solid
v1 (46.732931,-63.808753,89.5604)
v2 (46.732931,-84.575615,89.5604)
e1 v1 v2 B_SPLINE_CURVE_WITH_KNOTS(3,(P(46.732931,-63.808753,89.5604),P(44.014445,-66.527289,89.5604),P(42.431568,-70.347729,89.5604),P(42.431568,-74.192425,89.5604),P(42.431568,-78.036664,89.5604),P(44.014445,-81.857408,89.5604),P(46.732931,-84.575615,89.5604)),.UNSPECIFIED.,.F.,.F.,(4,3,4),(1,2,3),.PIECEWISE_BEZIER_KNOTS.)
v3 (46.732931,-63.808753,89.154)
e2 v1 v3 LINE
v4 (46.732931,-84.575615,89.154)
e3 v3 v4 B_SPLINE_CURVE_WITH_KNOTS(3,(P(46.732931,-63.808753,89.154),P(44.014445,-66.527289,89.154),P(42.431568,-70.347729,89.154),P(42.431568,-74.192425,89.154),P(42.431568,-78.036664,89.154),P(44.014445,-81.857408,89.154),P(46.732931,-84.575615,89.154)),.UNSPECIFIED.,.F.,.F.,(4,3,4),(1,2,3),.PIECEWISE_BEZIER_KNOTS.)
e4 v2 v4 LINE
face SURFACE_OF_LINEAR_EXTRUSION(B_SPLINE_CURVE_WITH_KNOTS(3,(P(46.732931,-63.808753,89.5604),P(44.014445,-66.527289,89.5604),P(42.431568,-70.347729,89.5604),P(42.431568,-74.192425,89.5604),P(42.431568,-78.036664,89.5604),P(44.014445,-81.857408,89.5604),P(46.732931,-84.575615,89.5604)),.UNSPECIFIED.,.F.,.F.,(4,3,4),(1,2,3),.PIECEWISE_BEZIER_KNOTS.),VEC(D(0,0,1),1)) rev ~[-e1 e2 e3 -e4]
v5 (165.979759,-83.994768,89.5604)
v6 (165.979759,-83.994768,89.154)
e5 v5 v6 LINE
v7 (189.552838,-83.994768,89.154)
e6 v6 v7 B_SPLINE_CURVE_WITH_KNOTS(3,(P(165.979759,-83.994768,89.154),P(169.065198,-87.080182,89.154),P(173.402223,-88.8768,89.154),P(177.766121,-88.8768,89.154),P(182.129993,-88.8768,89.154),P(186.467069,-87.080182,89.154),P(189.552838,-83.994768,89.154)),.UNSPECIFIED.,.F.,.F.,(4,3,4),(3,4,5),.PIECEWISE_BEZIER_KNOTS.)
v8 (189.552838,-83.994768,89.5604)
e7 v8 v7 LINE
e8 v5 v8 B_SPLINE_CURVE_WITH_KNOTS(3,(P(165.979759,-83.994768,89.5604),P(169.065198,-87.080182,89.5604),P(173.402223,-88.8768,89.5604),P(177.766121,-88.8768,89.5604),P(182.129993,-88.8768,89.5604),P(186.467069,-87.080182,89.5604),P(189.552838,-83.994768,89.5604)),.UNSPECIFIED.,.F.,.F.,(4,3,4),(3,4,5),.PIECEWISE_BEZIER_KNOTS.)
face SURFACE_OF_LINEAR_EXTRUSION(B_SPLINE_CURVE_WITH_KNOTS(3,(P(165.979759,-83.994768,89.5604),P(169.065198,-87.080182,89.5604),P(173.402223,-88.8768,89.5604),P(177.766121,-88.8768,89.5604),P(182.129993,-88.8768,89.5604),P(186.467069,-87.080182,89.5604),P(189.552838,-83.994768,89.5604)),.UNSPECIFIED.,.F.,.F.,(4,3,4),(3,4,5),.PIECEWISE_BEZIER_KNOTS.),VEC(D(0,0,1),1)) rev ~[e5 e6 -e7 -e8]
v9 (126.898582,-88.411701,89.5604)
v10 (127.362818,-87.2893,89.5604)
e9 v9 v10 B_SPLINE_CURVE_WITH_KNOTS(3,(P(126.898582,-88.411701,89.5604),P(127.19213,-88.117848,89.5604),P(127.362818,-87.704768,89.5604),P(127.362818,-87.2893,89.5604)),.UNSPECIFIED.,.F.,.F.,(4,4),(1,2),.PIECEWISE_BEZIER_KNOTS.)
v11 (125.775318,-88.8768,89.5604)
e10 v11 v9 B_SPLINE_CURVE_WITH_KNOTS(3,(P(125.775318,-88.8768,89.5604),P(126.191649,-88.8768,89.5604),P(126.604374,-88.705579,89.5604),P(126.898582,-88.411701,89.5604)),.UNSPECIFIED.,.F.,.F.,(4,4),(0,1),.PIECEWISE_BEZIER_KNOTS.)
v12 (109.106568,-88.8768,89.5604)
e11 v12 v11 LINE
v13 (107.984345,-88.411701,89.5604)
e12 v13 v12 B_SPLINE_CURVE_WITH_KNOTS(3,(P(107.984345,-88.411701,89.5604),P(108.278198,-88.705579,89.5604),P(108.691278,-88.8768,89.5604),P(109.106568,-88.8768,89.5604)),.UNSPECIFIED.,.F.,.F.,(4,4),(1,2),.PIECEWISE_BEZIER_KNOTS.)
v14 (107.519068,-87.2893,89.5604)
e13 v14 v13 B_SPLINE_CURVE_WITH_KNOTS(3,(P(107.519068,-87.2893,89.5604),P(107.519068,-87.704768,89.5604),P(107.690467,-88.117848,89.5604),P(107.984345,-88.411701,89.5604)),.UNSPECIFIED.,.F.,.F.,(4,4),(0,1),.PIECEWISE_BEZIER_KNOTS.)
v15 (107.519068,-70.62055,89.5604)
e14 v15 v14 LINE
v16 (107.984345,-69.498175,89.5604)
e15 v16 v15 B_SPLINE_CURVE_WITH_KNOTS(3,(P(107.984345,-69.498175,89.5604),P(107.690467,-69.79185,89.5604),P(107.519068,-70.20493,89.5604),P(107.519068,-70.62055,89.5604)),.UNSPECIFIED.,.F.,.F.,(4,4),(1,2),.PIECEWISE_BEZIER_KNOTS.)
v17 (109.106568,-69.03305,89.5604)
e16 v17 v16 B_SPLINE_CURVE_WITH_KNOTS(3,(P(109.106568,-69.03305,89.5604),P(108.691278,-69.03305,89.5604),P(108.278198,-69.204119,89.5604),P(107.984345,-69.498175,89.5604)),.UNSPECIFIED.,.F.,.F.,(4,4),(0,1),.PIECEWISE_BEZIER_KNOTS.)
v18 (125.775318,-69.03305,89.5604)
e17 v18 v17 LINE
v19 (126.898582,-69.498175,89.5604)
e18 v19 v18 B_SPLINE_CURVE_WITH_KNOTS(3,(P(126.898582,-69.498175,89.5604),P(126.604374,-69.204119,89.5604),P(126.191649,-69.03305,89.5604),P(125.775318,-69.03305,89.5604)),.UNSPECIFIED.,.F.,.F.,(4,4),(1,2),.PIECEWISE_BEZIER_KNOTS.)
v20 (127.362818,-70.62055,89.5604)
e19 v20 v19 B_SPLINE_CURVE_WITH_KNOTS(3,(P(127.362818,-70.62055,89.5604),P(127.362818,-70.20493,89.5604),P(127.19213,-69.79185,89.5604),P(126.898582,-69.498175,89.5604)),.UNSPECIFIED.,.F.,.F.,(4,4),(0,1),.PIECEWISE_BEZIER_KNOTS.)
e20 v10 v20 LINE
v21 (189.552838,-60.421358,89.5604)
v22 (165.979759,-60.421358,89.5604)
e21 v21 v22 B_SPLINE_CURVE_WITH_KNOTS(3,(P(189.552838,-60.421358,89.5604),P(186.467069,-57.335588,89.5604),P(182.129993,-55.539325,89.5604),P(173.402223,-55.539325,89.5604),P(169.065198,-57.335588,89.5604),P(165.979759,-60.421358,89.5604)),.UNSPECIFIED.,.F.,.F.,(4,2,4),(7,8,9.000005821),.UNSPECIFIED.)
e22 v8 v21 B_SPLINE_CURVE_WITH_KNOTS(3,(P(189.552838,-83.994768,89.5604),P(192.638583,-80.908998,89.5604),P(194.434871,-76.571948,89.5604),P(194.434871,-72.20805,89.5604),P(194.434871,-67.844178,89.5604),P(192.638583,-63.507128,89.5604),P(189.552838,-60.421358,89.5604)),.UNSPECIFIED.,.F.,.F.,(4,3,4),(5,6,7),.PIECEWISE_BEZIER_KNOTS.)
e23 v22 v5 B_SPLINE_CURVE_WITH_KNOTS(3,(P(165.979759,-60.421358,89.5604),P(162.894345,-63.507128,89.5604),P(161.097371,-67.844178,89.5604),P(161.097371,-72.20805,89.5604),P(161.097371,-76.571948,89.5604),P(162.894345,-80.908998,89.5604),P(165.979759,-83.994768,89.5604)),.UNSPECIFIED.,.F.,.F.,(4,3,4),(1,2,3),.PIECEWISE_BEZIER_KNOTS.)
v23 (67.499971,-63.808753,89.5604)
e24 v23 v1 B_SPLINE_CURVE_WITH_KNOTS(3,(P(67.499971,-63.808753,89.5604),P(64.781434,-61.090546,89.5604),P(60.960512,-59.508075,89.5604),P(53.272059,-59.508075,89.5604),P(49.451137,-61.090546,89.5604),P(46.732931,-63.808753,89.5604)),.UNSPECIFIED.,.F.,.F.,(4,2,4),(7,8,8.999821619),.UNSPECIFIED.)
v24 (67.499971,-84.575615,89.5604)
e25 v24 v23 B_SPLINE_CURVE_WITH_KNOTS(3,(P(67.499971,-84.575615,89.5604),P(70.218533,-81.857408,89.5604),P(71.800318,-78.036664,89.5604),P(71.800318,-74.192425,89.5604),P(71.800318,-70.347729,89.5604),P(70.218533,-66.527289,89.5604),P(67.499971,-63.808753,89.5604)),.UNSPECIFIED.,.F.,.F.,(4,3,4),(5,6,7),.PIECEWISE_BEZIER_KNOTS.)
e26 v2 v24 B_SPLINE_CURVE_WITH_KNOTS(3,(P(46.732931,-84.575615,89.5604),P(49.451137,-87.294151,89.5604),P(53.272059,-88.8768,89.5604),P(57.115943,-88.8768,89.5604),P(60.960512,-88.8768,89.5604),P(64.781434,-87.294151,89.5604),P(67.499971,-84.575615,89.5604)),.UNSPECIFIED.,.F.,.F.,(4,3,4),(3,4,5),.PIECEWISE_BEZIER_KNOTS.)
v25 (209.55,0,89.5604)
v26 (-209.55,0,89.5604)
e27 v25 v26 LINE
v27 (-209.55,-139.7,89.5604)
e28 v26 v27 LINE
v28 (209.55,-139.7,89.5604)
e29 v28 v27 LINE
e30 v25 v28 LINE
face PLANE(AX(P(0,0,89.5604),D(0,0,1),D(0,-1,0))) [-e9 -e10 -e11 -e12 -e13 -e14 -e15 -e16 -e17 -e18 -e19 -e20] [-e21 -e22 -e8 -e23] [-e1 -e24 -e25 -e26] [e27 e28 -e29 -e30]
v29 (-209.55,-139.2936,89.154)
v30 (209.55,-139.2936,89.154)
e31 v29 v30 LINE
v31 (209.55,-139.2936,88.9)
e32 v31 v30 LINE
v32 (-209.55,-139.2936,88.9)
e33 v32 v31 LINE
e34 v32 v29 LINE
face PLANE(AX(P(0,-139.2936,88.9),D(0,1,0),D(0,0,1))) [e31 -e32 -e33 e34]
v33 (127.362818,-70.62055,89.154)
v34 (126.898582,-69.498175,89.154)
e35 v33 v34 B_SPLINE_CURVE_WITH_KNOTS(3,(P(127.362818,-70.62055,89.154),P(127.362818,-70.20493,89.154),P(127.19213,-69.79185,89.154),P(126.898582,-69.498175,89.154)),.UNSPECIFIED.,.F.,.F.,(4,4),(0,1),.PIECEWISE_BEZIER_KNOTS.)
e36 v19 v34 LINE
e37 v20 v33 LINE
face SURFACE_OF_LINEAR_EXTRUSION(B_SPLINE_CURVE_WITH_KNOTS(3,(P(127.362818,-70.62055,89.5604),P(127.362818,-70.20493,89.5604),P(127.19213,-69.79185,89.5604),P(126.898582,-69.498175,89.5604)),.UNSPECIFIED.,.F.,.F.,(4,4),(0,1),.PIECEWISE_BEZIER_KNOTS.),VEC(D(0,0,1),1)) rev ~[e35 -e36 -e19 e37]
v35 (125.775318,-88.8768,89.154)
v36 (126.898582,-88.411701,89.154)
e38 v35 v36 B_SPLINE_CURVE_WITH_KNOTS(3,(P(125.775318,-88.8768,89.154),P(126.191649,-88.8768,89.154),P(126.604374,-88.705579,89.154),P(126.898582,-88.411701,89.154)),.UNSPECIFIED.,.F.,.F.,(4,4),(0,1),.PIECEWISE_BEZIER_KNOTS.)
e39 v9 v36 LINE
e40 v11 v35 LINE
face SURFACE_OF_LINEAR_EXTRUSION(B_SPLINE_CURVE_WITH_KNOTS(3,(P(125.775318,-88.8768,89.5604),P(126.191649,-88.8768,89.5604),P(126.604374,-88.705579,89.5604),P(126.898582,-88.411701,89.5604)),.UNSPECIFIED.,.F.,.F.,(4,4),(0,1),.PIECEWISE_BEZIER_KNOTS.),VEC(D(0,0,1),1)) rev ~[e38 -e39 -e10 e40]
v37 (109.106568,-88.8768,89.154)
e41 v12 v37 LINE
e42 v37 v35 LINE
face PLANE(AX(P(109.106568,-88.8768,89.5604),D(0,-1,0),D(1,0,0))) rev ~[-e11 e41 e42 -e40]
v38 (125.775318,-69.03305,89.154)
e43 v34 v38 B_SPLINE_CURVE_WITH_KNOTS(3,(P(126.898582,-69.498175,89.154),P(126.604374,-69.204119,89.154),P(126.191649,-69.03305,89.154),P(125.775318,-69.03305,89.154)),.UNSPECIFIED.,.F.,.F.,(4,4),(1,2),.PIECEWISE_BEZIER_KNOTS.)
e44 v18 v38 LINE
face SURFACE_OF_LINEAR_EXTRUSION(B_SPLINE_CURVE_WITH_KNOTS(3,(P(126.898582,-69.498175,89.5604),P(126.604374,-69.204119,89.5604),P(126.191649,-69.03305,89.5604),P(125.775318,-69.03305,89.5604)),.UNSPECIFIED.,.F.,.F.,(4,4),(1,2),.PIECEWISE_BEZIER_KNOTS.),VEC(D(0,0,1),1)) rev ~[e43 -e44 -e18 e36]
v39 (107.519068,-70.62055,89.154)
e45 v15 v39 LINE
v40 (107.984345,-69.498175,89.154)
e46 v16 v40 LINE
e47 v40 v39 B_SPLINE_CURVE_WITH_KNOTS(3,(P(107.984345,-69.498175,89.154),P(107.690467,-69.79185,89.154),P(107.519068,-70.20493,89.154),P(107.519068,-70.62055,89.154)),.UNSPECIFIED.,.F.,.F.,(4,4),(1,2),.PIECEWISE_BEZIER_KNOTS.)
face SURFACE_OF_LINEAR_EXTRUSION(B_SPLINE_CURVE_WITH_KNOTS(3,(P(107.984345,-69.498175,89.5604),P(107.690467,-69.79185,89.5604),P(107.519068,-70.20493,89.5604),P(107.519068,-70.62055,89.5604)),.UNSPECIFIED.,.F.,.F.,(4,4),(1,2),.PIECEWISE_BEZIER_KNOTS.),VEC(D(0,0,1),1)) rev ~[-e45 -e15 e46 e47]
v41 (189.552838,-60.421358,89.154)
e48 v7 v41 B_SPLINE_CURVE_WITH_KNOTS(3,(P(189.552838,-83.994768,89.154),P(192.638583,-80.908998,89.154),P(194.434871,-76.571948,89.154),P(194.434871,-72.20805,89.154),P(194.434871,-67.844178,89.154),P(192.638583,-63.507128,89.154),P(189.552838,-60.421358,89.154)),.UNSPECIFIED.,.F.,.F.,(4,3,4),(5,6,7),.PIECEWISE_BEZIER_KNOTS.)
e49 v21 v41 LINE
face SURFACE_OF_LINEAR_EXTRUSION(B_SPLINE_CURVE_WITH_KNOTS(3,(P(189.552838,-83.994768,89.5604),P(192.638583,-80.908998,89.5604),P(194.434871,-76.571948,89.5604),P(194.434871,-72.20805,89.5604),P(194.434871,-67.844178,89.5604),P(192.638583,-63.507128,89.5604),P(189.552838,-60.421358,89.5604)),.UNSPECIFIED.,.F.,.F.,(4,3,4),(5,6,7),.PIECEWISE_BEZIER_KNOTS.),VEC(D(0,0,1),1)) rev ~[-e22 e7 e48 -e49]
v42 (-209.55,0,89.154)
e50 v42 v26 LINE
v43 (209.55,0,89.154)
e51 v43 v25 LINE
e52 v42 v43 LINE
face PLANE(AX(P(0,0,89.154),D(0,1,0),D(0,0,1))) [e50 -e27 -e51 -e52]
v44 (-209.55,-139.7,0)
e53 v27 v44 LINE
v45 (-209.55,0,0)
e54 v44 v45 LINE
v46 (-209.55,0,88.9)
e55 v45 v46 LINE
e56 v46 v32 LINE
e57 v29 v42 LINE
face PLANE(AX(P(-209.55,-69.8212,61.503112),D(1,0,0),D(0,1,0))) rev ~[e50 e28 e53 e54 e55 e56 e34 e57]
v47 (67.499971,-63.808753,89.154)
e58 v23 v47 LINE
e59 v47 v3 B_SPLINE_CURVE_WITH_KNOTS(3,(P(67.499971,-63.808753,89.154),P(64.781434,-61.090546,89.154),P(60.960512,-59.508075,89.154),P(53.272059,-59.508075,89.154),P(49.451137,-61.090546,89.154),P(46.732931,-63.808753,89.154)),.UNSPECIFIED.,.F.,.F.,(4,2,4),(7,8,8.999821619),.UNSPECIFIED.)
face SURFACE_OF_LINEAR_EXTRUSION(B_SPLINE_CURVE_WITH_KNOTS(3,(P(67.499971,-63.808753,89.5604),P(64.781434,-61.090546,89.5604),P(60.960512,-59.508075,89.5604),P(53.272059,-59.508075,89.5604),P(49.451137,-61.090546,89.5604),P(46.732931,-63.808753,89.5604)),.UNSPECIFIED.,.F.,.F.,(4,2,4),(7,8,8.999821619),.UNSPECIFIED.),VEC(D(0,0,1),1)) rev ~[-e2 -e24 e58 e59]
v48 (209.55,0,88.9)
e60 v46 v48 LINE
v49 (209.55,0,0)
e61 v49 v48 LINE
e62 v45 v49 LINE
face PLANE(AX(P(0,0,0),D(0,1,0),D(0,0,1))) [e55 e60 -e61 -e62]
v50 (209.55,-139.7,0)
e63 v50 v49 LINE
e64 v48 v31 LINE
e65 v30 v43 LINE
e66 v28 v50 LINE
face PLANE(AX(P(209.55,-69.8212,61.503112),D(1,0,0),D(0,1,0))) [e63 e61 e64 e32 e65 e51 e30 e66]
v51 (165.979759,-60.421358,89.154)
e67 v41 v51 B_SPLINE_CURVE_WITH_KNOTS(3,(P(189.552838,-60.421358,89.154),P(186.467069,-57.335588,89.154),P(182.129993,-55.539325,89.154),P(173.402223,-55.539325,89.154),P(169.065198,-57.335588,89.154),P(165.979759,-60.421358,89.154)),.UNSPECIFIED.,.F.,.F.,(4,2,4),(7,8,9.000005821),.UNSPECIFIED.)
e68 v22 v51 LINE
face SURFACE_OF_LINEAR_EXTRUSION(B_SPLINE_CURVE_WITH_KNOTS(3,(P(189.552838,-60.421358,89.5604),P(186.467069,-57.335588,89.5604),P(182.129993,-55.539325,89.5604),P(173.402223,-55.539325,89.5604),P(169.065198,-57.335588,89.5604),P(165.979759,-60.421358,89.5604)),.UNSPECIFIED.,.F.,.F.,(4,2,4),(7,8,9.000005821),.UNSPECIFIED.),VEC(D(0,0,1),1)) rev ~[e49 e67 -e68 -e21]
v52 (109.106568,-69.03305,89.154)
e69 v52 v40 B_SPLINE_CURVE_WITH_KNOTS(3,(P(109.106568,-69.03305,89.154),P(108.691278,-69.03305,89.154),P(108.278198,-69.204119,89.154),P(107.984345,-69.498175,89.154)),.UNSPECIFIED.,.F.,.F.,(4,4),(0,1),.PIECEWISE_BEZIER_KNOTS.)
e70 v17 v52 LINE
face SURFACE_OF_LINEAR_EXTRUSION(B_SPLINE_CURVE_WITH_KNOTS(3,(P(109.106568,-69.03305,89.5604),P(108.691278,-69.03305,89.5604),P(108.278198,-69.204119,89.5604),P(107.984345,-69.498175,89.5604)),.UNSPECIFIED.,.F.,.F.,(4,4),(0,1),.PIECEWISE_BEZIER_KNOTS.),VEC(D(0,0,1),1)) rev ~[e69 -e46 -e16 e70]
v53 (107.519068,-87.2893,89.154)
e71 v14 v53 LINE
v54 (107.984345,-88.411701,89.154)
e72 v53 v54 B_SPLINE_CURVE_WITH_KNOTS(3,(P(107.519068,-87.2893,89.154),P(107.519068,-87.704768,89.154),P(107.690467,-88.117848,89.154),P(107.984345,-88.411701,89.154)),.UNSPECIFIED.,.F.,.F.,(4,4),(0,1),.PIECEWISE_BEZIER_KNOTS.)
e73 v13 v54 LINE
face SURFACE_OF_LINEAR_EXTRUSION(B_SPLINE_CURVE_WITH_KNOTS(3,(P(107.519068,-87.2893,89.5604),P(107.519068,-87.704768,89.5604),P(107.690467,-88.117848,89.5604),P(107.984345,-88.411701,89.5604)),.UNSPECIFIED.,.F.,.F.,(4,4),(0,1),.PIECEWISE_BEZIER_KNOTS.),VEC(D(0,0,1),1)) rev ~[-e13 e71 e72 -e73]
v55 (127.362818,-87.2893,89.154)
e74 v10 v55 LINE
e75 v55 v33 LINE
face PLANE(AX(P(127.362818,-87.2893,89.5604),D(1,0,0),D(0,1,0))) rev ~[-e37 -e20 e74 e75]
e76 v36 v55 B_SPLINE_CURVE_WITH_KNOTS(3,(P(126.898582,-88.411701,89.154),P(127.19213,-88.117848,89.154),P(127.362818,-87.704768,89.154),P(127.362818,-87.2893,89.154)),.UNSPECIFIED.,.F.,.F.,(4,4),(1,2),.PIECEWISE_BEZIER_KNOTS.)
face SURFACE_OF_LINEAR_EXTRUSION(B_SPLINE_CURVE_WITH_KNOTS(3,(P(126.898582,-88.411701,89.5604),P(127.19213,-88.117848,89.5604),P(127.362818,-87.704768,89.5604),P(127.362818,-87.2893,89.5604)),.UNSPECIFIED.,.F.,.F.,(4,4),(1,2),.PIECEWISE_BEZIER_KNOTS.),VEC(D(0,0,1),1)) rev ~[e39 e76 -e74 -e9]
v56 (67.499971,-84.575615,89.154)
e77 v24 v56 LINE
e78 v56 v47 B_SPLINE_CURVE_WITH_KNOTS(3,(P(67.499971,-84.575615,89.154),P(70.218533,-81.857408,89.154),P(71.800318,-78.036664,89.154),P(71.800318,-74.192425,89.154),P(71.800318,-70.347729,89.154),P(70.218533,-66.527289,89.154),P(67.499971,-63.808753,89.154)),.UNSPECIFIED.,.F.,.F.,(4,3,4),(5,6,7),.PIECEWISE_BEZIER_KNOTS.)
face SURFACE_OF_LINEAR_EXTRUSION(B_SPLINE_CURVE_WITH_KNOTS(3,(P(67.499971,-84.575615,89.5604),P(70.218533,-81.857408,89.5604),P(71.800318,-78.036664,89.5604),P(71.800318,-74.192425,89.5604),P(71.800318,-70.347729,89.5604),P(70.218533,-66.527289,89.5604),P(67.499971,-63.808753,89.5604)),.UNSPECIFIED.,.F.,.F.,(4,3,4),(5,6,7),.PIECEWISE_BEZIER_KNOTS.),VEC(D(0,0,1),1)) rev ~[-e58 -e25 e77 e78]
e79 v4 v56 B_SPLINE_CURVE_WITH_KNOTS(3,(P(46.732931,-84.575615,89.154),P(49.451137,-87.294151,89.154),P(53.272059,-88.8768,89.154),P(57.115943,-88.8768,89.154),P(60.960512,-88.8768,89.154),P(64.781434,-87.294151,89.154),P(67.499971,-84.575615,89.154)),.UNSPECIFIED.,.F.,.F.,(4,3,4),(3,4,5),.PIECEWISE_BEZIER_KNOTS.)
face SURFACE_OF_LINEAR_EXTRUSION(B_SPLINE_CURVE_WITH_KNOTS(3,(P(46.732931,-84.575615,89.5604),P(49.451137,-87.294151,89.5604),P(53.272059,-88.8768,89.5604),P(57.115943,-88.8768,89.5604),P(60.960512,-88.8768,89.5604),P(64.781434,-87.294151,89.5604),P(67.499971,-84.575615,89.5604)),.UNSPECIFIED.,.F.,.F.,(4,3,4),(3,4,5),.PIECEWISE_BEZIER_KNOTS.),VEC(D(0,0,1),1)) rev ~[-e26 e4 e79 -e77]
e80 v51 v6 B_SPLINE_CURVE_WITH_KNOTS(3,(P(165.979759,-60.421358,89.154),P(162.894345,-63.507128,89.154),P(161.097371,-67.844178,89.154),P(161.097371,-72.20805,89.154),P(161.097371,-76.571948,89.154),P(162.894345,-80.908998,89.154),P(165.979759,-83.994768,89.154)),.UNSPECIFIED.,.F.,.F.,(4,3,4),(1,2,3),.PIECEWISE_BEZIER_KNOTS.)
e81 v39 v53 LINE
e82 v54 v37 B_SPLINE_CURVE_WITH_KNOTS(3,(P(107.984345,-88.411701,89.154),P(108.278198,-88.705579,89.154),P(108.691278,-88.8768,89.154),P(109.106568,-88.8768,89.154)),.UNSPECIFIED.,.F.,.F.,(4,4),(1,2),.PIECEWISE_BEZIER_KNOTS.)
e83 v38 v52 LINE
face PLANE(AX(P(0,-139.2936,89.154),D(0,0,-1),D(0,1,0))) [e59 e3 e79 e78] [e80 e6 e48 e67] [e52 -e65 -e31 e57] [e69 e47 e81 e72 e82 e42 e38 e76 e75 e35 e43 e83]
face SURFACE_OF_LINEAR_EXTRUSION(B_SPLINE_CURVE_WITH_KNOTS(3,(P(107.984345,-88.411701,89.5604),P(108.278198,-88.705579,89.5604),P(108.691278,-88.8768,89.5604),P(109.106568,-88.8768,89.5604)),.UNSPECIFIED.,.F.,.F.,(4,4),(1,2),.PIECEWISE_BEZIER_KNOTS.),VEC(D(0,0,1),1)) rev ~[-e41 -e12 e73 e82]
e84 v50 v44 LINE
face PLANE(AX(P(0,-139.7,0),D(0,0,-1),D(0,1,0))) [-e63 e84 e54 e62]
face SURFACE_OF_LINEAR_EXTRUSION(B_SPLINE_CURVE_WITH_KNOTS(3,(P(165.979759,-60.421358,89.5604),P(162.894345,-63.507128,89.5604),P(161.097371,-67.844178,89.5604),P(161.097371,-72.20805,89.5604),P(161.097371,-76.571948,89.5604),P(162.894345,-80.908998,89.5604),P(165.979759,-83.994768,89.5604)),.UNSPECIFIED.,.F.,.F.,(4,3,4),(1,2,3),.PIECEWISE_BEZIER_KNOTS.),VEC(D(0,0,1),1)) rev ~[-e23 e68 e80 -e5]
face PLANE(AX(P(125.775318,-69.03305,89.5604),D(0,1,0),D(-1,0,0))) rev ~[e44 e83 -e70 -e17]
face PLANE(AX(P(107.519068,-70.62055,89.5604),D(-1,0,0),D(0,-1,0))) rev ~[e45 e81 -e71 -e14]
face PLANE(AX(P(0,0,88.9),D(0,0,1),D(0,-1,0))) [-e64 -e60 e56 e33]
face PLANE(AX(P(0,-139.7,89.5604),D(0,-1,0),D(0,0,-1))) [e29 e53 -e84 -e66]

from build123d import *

# Parameters (mm, degrees)
F1_DEPTH = 209.55
F3_DEPTH = 0.4064


# Not quite as in the source:
# - the dataset's text gives a spline's control points without its knots; the knots are read off the source's solid


with BuildPart() as f1:
    # F0 (on Right) → F1 (new body, symmetric)
    with BuildSketch(Plane.YZ):
        Polygon((-139.7, 0), (0, 0), (0, 88.9), (-139.2936, 88.9), (-139.2936, 89.154), (0, 89.154), (0, 89.5604), (-139.7, 89.5604), align=None)
    extrude(amount=F1_DEPTH, both=True)

    # F2 (on face) → F3 (cut, through all)
    with BuildSketch(Plane.XY.offset(89.5604)):
        with BuildLine():
            add(Edge.make_bspline(
                [(107.984345256, -69.4981747566), (107.690467256, -69.7918495566), (107.519068056, -70.2049297566), (107.519068056, -70.6205499566)],
                knots=[1, 1, 1, 1, 2, 2, 2, 2], degree=3))
            Line((107.519068056, -70.6205499566), (107.519068056, -87.2892999566))
            add(Edge.make_bspline(
                [(107.519068056, -87.2892999566), (107.519068056, -87.7047677566), (107.690467256, -88.1178479566), (107.984345256, -88.4117005566)],
                knots=[0, 0, 0, 0, 1, 1, 1, 1], degree=3))
            add(Edge.make_bspline(
                [(107.984345256, -88.4117005566), (108.278197856, -88.7055785566), (108.691278056, -88.8767999566), (109.106568056, -88.8767999566)],
                knots=[1, 1, 1, 1, 2, 2, 2, 2], degree=3))
            Line((109.106568056, -88.8767999566), (125.775318056, -88.8767999566))
            add(Edge.make_bspline(
                [(125.775318056, -88.8767999566), (126.191649456, -88.8767999566), (126.604374056, -88.7055785566), (126.898582256, -88.4117005566)],
                knots=[0, 0, 0, 0, 1, 1, 1, 1], degree=3))
            add(Edge.make_bspline(
                [(126.898582256, -88.4117005566), (127.192130056, -88.1178479566), (127.362818056, -87.7047677566), (127.362818056, -87.2892999566)],
                knots=[1, 1, 1, 1, 2, 2, 2, 2], degree=3))
            Line((127.362818056, -87.2892999566), (127.362818056, -70.6205499566))
            add(Edge.make_bspline(
                [(127.362818056, -70.6205499566), (127.362818056, -70.2049297566), (127.192130056, -69.7918495566), (126.898582256, -69.4981747566)],
                knots=[0, 0, 0, 0, 1, 1, 1, 1], degree=3))
            add(Edge.make_bspline(
                [(126.898582256, -69.4981747566), (126.604374056, -69.2041189566), (126.191649456, -69.0330499566), (125.775318056, -69.0330499566)],
                knots=[1, 1, 1, 1, 2, 2, 2, 2], degree=3))
            Line((125.775318056, -69.0330499566), (109.106568056, -69.0330499566))
            add(Edge.make_bspline(
                [(109.106568056, -69.0330499566), (108.691278056, -69.0330499566), (108.278197856, -69.2041189566), (107.984345256, -69.4981747566)],
                knots=[0, 0, 0, 0, 1, 1, 1, 1], degree=3))
        make_face()
        with BuildLine():
            add(Edge.make_bspline(
                [(67.499971056, -63.8087525566), (64.781434456, -61.0905461566), (60.960512456, -59.5080753566), (57.115943056, -59.5080753566)],
                knots=[7, 7, 7, 7, 8, 8, 8, 8], degree=3))
            add(Edge.make_bspline(
                [(57.115943056, -59.5080753566), (53.272059456, -59.5080753566), (49.451137456, -61.0905461566), (46.732931056, -63.8087525566)],
                knots=[0, 0, 0, 0, 1, 1, 1, 1], degree=3))
            add(Edge.make_bspline(
                [(46.732931056, -63.8087525566), (44.014445256, -66.5272891566), (42.431568056, -70.3477285566), (42.431568056, -74.1924249566), (42.431568056, -78.0366641566), (44.014445256, -81.8574083566), (46.732931056, -84.5756147566)],
                knots=[1, 1, 1, 1, 2, 2, 2, 3, 3, 3, 3], degree=3))
            add(Edge.make_bspline(
                [(46.732931056, -84.5756147566), (49.451137456, -87.2941513566), (53.272059456, -88.8767999566), (57.115943056, -88.8767999566), (60.960512456, -88.8767999566), (64.781434456, -87.2941513566), (67.499971056, -84.5756147566)],
                knots=[3, 3, 3, 3, 4, 4, 4, 5, 5, 5, 5], degree=3))
            add(Edge.make_bspline(
                [(67.499971056, -84.5756147566), (70.218533056, -81.8574083566), (71.800318056, -78.0366641566), (71.800318056, -74.1924249566), (71.800318056, -70.3477285566), (70.218533056, -66.5272891566), (67.499971056, -63.8087525566)],
                knots=[5, 5, 5, 5, 6, 6, 6, 7, 7, 7, 7], degree=3))
        make_face()
        with BuildLine():
            add(Edge.make_bspline(
                [(189.552838456, -60.4213577566), (186.467068656, -57.3355879566), (182.129993256, -55.5393253566), (177.766120856, -55.5393253566)],
                knots=[7, 7, 7, 7, 8, 8, 8, 8], degree=3))
            add(Edge.make_bspline(
                [(177.766120856, -55.5393253566), (173.402223056, -55.5393253566), (169.065198456, -57.3355879566), (165.979758856, -60.4213577566)],
                knots=[0, 0, 0, 0, 1, 1, 1, 1], degree=3))
            add(Edge.make_bspline(
                [(165.979758856, -60.4213577566), (162.894344656, -63.5071275566), (161.097370856, -67.8441775566), (161.097370856, -72.2080499566), (161.097370856, -76.5719477566), (162.894344656, -80.9089977566), (165.979758856, -83.9947675566)],
                knots=[1, 1, 1, 1, 2, 2, 2, 3, 3, 3, 3], degree=3))
            add(Edge.make_bspline(
                [(165.979758856, -83.9947675566), (169.065198456, -87.0801817566), (173.402223056, -88.8767999566), (177.766120856, -88.8767999566), (182.129993256, -88.8767999566), (186.467068656, -87.0801817566), (189.552838456, -83.9947675566)],
                knots=[3, 3, 3, 3, 4, 4, 4, 5, 5, 5, 5], degree=3))
            add(Edge.make_bspline(
                [(189.552838456, -83.9947675566), (192.638582856, -80.9089977566), (194.434870856, -76.5719477566), (194.434870856, -72.2080499566), (194.434870856, -67.8441775566), (192.638582856, -63.5071275566), (189.552838456, -60.4213577566)],
                knots=[5, 5, 5, 5, 6, 6, 6, 7, 7, 7, 7], degree=3))
        make_face()
    extrude(amount=-F3_DEPTH, mode=Mode.SUBTRACT)


solid = f1.part
